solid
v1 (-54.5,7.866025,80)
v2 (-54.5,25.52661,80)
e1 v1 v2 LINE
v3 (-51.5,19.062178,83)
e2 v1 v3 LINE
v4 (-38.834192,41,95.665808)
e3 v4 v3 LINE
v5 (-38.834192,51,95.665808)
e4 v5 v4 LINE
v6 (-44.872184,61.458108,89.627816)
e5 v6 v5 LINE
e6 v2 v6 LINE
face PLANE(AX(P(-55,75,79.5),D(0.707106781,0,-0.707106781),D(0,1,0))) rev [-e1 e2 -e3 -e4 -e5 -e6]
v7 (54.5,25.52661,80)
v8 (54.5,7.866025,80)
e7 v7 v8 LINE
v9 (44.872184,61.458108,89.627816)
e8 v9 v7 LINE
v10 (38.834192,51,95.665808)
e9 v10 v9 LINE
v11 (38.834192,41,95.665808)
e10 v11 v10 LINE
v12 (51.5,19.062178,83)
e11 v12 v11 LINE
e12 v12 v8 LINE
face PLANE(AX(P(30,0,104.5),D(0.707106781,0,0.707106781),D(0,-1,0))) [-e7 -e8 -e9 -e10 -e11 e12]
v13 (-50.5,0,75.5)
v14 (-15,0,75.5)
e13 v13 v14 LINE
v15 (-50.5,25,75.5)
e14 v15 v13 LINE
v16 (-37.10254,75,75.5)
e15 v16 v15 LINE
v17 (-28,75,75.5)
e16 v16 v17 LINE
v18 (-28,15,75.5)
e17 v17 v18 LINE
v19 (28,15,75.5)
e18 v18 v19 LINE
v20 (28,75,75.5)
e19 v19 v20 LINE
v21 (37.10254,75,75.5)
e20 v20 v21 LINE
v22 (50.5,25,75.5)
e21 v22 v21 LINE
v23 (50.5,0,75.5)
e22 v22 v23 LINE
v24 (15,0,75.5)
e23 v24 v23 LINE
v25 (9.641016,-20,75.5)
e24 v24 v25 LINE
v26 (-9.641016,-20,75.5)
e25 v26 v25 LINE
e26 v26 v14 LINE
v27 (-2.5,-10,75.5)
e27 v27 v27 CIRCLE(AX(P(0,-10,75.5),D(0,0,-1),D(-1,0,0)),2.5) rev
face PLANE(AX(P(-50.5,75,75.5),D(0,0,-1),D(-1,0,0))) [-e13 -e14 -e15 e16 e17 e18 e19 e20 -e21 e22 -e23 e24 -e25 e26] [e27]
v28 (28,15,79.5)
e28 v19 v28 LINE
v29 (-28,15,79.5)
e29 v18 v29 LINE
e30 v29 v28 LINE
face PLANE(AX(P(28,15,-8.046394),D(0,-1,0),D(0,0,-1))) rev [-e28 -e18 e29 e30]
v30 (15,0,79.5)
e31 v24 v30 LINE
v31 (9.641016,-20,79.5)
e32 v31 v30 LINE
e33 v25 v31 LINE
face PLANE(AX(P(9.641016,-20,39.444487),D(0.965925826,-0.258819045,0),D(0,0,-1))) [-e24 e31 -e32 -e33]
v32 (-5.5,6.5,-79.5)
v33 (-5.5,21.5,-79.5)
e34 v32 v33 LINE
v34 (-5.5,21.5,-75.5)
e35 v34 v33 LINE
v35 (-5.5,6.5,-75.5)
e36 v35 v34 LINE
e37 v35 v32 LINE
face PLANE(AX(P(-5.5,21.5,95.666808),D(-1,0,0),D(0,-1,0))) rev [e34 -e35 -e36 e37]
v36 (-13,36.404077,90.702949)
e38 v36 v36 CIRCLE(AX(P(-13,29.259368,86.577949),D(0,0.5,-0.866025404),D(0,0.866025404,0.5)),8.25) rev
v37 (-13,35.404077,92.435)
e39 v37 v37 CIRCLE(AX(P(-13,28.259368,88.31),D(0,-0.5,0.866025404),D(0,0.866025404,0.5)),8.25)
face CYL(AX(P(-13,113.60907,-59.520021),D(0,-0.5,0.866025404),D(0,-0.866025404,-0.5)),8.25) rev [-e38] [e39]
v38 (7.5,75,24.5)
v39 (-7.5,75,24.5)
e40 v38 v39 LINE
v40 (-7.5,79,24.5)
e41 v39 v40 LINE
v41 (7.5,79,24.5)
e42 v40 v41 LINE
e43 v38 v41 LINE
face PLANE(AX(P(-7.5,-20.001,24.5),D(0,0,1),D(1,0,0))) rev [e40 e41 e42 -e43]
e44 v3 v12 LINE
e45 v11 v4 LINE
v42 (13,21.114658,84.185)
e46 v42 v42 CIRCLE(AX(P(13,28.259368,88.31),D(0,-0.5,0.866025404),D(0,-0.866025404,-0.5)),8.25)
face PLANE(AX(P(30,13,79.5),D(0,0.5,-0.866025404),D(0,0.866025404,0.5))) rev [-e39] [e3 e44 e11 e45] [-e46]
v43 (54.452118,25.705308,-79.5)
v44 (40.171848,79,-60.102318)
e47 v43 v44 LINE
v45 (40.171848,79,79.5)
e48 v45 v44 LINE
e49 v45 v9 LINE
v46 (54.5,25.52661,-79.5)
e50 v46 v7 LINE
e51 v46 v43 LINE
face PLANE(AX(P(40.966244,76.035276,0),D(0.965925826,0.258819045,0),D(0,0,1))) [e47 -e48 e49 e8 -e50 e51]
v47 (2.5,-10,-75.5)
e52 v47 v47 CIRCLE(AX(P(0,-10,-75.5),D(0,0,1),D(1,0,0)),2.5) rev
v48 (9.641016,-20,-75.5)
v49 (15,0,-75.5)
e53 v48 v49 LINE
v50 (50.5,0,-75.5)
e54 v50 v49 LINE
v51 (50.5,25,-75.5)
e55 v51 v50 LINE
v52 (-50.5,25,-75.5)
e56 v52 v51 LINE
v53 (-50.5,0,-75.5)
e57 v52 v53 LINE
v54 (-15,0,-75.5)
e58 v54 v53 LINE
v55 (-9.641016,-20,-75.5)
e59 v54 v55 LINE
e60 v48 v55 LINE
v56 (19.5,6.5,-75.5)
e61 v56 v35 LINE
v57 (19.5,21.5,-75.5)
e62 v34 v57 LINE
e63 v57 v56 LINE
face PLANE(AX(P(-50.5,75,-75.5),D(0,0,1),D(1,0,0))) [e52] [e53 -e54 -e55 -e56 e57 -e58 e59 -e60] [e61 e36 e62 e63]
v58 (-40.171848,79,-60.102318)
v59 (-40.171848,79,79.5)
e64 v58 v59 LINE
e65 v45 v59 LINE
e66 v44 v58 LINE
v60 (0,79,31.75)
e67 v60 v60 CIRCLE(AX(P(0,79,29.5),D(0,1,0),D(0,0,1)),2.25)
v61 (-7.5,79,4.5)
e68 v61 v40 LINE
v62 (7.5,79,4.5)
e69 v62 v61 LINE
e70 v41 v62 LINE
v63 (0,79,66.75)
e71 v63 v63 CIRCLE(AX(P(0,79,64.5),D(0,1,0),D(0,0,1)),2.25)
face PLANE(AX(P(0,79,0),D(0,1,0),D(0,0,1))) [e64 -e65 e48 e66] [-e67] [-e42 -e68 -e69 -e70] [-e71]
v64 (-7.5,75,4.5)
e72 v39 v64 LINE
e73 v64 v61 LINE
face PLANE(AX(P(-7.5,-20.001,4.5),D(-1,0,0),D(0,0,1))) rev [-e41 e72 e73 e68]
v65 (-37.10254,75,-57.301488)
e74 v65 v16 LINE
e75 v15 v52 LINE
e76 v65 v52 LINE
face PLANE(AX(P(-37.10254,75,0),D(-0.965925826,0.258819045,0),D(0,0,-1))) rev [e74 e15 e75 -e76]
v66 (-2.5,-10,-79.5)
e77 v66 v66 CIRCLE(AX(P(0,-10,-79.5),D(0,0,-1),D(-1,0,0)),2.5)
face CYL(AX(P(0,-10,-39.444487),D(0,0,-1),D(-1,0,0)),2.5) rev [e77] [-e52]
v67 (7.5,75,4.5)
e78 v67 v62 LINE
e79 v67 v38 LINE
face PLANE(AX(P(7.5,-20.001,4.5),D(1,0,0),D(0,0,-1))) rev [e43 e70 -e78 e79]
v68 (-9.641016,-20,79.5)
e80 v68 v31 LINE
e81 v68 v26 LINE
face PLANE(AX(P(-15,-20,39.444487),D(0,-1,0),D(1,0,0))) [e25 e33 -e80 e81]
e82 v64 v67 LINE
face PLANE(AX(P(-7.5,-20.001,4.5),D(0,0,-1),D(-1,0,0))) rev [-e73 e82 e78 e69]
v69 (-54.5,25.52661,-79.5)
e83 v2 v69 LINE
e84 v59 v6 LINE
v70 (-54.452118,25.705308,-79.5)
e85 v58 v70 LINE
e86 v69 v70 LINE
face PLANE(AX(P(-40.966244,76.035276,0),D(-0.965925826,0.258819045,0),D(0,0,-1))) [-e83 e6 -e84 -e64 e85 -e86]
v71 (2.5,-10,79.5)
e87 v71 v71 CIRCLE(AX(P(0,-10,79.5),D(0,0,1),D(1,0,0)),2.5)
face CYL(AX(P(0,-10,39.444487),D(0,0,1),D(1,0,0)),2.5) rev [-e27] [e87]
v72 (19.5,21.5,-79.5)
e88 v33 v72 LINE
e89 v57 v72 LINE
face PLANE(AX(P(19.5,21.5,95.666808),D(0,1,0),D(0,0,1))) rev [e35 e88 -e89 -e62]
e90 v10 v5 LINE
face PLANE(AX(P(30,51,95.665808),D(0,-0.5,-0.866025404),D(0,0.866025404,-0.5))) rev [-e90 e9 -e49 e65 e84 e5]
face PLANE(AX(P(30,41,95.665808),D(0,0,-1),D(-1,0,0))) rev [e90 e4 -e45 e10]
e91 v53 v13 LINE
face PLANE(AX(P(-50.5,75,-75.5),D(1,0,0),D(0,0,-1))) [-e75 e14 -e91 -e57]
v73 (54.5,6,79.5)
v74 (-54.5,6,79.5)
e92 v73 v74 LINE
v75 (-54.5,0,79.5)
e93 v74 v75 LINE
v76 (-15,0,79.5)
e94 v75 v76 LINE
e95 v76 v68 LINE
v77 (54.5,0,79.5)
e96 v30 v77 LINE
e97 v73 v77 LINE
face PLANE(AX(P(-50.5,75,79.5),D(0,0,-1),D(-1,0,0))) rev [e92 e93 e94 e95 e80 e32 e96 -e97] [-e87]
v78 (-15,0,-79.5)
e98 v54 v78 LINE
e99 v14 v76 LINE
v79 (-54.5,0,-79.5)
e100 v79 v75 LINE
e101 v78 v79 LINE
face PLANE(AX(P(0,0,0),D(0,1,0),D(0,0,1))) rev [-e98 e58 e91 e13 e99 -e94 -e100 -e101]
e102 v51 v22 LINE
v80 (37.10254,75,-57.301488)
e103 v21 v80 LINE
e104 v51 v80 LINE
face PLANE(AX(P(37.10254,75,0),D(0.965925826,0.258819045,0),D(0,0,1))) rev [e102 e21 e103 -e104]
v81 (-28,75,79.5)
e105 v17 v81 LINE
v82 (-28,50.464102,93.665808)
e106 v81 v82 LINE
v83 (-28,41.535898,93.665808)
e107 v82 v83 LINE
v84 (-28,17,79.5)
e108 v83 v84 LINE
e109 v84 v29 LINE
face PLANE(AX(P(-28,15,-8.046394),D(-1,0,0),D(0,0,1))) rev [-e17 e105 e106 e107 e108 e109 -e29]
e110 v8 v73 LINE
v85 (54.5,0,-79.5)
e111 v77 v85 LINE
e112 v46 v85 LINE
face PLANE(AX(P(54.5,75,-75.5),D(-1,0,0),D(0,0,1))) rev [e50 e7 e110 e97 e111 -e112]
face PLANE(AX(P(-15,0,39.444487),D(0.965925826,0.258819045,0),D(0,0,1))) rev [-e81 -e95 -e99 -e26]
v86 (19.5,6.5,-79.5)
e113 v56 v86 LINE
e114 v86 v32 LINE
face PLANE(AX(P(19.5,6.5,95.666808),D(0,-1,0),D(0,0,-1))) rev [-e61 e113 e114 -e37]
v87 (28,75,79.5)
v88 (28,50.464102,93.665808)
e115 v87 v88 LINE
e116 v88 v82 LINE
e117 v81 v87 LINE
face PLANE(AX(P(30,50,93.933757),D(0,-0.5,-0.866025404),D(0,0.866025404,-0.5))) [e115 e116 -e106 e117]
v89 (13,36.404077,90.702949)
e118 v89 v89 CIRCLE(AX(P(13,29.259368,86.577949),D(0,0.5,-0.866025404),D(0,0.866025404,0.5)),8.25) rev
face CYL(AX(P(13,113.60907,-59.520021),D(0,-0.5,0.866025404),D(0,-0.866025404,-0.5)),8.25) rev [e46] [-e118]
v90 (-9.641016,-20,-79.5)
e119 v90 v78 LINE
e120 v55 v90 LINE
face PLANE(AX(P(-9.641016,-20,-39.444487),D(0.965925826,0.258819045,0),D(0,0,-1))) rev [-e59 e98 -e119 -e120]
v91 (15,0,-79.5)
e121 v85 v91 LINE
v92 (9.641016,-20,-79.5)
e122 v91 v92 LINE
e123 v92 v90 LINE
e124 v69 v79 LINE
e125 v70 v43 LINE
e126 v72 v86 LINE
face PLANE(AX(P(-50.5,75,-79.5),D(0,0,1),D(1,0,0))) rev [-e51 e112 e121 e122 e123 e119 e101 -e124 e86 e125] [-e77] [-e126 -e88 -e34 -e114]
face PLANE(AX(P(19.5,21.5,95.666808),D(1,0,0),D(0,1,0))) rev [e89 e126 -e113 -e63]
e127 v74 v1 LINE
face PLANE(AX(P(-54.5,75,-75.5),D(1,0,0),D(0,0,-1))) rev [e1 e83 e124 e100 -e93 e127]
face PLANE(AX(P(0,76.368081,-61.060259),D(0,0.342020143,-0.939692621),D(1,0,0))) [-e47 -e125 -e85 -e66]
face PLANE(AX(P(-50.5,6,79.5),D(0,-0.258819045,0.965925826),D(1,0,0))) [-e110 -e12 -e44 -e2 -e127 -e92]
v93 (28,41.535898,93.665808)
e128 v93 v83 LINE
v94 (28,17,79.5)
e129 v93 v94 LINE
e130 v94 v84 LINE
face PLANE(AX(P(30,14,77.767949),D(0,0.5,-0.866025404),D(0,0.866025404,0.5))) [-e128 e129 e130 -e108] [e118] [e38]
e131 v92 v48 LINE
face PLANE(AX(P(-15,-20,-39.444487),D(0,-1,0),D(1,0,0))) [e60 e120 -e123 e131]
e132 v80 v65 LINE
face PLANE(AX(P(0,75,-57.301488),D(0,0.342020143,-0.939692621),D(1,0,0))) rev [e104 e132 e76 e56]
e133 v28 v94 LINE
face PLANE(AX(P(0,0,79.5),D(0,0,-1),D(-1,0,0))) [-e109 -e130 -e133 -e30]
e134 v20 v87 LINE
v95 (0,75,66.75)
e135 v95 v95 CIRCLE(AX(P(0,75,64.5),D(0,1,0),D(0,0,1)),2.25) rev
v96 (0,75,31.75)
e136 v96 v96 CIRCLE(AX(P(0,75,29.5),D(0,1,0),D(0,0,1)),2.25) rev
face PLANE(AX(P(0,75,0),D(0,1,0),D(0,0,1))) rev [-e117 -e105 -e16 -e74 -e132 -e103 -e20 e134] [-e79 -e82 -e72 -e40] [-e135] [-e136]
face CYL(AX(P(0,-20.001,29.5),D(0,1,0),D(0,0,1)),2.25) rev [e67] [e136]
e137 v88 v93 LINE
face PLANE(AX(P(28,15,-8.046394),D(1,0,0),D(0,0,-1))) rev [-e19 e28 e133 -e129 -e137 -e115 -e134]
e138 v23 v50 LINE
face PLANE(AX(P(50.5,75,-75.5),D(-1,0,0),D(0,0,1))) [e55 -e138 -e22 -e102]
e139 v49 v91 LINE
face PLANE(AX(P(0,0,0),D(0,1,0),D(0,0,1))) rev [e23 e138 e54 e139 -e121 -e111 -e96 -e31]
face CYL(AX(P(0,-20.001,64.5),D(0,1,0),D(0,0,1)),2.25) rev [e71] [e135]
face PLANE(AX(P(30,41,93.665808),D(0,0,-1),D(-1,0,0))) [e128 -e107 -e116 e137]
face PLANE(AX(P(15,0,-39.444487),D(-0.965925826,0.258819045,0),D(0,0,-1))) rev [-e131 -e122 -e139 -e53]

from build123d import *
from OCP.BRepFilletAPI import BRepFilletAPI_MakeChamfer

# Parameters (mm, degrees)
SKETCH1_W                                    = 101
SKETCH1_H                                    = 151
BOX_DEPTH                                    = 75
CHAMFER_SIDES_SIZE                           = 50
CHAMFER_SIDES_SIZE2                          = 13.397459622
CHAMFER_BACK_SIZE                            = 50
CHAMFER_BACK_SIZE2                           = 18.198511713
SHELL1_T                                     = 4
SKETCH2_W                                    = 30
SKETCH2_H                                    = 20
SKETCH2_R                                    = 2.5
FRONT_MOUNT_TAB_DEPTH                        = 4
BACK_START                                   = -4
SKETCH3_W                                    = 30
SKETCH3_H                                    = 20
SKETCH3_R                                    = 2.5
BACK_MOUNT_TAB_DEPTH                         = 4
CHAMFER_MOUNT_TAB_SIZE                       = 20
CHAMFER_MOUNT_TAB_SIZE_2                     = 5.358983849
HEAD_ASSEMBLY_MOUNT_AND_CABLE_PASSTHRU_REACH = 140.172
SKETCH4_R                                    = 2.25
SKETCH4_W                                    = 15
SKETCH4_H                                    = 20
STAIR_DETECTION_MOUNT_DEPTH                  = 30
SHELL_START                                  = -28
SHELL_MOUNT_DEPTH                            = 56
SKETCH7_W                                    = 56
SKETCH7_H                                    = 62
OPEN_SHELL_TO_SHELL_DEPTH                    = 4
FILL_GAP_REACH                               = 187.721
SKETCH9_W                                    = 56
SKETCH9_H                                    = 2
STAIR_DETECTION_EYE_HOLES_REACH              = 183.466
SKETCH8_R                                    = 8.25
CHAMFER_FRONT_1_SIZE                         = 25
CHAMFER_FRONT_2_SIZE                         = 7
POWER_SWITCH_AND_USB_ACCESS_REACH            = 201.736
SKETCH10_W                                   = 25
SKETCH10_H                                   = 15


# Read off the part's stored shape, not the designer's step: shell mount
# Some blends are built 0.0001 mm under size
with BuildPart() as part:
    # Sketch1 → box (new body)
    with BuildSketch(Plane(origin=(0, 0, 0), x_dir=(1, 0, 0), z_dir=(0, 1, 0))):
        Rectangle(SKETCH1_W, SKETCH1_H)
    extrude(amount=BOX_DEPTH)

    # Chamfer sides: one chamfer whose edges measure the first distance from different faces: ONE call of the kernel's chamfer builder (chamfer() names one face for all edges)
    chamfer_sides_edges_1 = [part.edges().sort_by_distance(p)[0] for p in [
        (-50.5, 75, 0),
    ]]
    chamfer_sides_side_1 = [part.faces().sort_by_distance(p)[0] for p in [
        (-50.5, 37.5, 0),
    ]]
    chamfer_sides_edges_2 = [part.edges().sort_by_distance(p)[0] for p in [
        (50.5, 75, 0),
    ]]
    chamfer_sides_side_2 = [part.faces().sort_by_distance(p)[0] for p in [
        (50.5, 37.5, 0),
    ]]
    chamfer_sides = BRepFilletAPI_MakeChamfer(part.part.solid().wrapped)
    for e in chamfer_sides_edges_1:
        chamfer_sides.Add(CHAMFER_SIDES_SIZE, CHAMFER_SIDES_SIZE2, e.wrapped, chamfer_sides_side_1[0].wrapped)  # the first distance lies on this face
    for e in chamfer_sides_edges_2:
        chamfer_sides.Add(CHAMFER_SIDES_SIZE, CHAMFER_SIDES_SIZE2, e.wrapped, chamfer_sides_side_2[0].wrapped)  # the first distance lies on this face
    add(Compound.cast(chamfer_sides.Shape()), mode=Mode.REPLACE)

    # Chamfer back
    chamfer_back_edges = [part.edges().sort_by_distance(p)[0] for p in [
        (0, 75, -75.5),
    ]]
    chamfer_back_side = [part.faces().sort_by_distance(p)[0] for p in [
        (0, 35.478938394, -75.5),
    ]]
    chamfer(chamfer_back_edges, length=CHAMFER_BACK_SIZE, length2=CHAMFER_BACK_SIZE2, reference=chamfer_back_side[0])

    # Shell1
    shell1_openings = [part.faces().sort_by_distance(p)[0] for p in [
        (0, 0, 0),
    ]]
    offset(amount=SHELL1_T, openings=shell1_openings, kind=Kind.INTERSECTION)

    # Sketch2 → front mount tab (add)
    with BuildSketch(Plane.XY.offset(79.5)):
        with Locations((0, -10)):
            Rectangle(SKETCH2_W, SKETCH2_H)
        with Locations((0, -10)):
            Circle(SKETCH2_R, mode=Mode.SUBTRACT)
    extrude(amount=-FRONT_MOUNT_TAB_DEPTH)

    # Sketch3 → back mount tab (add)
    with BuildSketch(Plane(origin=(0, 0, -79.5), x_dir=(-1, 0, 0), z_dir=(0, 0, -1)).offset(BACK_START)):
        with Locations((0, -10)):
            Rectangle(SKETCH3_W, SKETCH3_H)
        with Locations(Location((0, -10, 0), (0, 0, 180))):
            Circle(SKETCH3_R, mode=Mode.SUBTRACT)
    extrude(amount=BACK_MOUNT_TAB_DEPTH)

    # Chamfer mount tab
    chamfer_mount_tab_edges_1 = [part.edges().sort_by_distance(p)[0] for p in [
        (-15, -20, 77.5),
    ]]
    chamfer_mount_tab_side_1 = [part.faces().sort_by_distance(p)[0] for p in [
        (-15, -19.892820323, 77.5),
    ]]
    chamfer_mount_tab_edges_2 = [part.edges().sort_by_distance(p)[0] for p in [
        (15, -20, 77.5),
    ]]
    chamfer_mount_tab_side_2 = [part.faces().sort_by_distance(p)[0] for p in [
        (15, -19.892820323, 77.5),
    ]]
    chamfer_mount_tab_edges_3 = [part.edges().sort_by_distance(p)[0] for p in [
        (-15, -20, -77.5),
    ]]
    chamfer_mount_tab_side_3 = [part.faces().sort_by_distance(p)[0] for p in [
        (-15, -19.892820323, -77.5),
    ]]
    chamfer_mount_tab_edges_4 = [part.edges().sort_by_distance(p)[0] for p in [
        (15, -20, -77.5),
    ]]
    chamfer_mount_tab_side_4 = [part.faces().sort_by_distance(p)[0] for p in [
        (14.892820323, -20, -77.5),
    ]]
    chamfer_mount_tab = BRepFilletAPI_MakeChamfer(part.part.solid().wrapped)
    for e in chamfer_mount_tab_edges_1:
        chamfer_mount_tab.Add(CHAMFER_MOUNT_TAB_SIZE - 0.0001, CHAMFER_MOUNT_TAB_SIZE_2 - 0.0001, e.wrapped, chamfer_mount_tab_side_1[0].wrapped)
    for e in chamfer_mount_tab_edges_2:
        chamfer_mount_tab.Add(CHAMFER_MOUNT_TAB_SIZE - 0.0001, CHAMFER_MOUNT_TAB_SIZE_2 - 0.0001, e.wrapped, chamfer_mount_tab_side_2[0].wrapped)
    for e in chamfer_mount_tab_edges_3:
        chamfer_mount_tab.Add(CHAMFER_MOUNT_TAB_SIZE - 0.0001, CHAMFER_MOUNT_TAB_SIZE_2 - 0.0001, e.wrapped, chamfer_mount_tab_side_3[0].wrapped)
    for e in chamfer_mount_tab_edges_4:
        chamfer_mount_tab.Add(CHAMFER_MOUNT_TAB_SIZE_2 - 0.0001, CHAMFER_MOUNT_TAB_SIZE - 0.0001, e.wrapped, chamfer_mount_tab_side_4[0].wrapped)
    add(Compound.cast(chamfer_mount_tab.Shape()), mode=Mode.REPLACE)  # a hair under: the kernel refuses the full size

    # Sketch4 → head assembly mount and cable passthru (cut, up to next)
    with BuildSketch(Plane(origin=(0, 79, 0), x_dir=(1, 0, 0), z_dir=(0, 1, 0)), mode=Mode.PRIVATE) as head_assembly_mount_and_cable_passthru_sk1:
        with Locations(Location((0, -64.5, 0), (0, 0, 270))):
            Circle(SKETCH4_R)
    head_assembly_mount_and_cable_passthru_tool1 = extrude(head_assembly_mount_and_cable_passthru_sk1.sketch, amount=-HEAD_ASSEMBLY_MOUNT_AND_CABLE_PASSTHRU_REACH, mode=Mode.PRIVATE) & part.part
    # Sketch4 → head assembly mount and cable passthru (cut, up to next)
    with BuildSketch(Plane(origin=(0, 79, 0), x_dir=(1, 0, 0), z_dir=(0, 1, 0)), mode=Mode.PRIVATE) as head_assembly_mount_and_cable_passthru_sk2:
        with Locations(Location((0, -29.5, 0), (0, 0, 270))):
            Circle(SKETCH4_R)
    head_assembly_mount_and_cable_passthru_tool2 = extrude(head_assembly_mount_and_cable_passthru_sk2.sketch, amount=-HEAD_ASSEMBLY_MOUNT_AND_CABLE_PASSTHRU_REACH, mode=Mode.PRIVATE) & part.part
    # Sketch4 → head assembly mount and cable passthru (cut, up to next)
    with BuildSketch(Plane(origin=(0, 79, 0), x_dir=(1, 0, 0), z_dir=(0, 1, 0)), mode=Mode.PRIVATE) as head_assembly_mount_and_cable_passthru_sk3:
        with Locations((0, -14.5)):
            Rectangle(SKETCH4_W, SKETCH4_H)
    head_assembly_mount_and_cable_passthru_tool3 = extrude(head_assembly_mount_and_cable_passthru_sk3.sketch, amount=-HEAD_ASSEMBLY_MOUNT_AND_CABLE_PASSTHRU_REACH, mode=Mode.PRIVATE) & part.part
    add(head_assembly_mount_and_cable_passthru_tool1.solids().sort_by_distance((0, 79, 64.5))[0], mode=Mode.SUBTRACT)
    add(head_assembly_mount_and_cable_passthru_tool2.solids().sort_by_distance((0, 79, 29.5))[0], mode=Mode.SUBTRACT)
    add(head_assembly_mount_and_cable_passthru_tool3.solids().sort_by_distance((0, 79, 14.5))[0], mode=Mode.SUBTRACT)


with BuildPart() as body_2:
    # Sketch5 → stair detection mount (new, symmetric)
    with BuildSketch(Plane(origin=(0, 0, 0), x_dir=(0, 0, -1), z_dir=(1, 0, 0))):
        Polygon((-79.5, 13), (-95.665807537, 41), (-95.665807537, 51), (-79.5, 79), (-75.5, 79), (-75.5, 75), (-75.5, 25), (-75.5, 13), align=None)
    extrude(amount=STAIR_DETECTION_MOUNT_DEPTH, both=True)

    # shell mount outline → shell mount (cut)
    with BuildSketch(Plane.YZ.offset(SHELL_START)):
        Polygon((77, 75.5), (77, 78.345299462), (50.464101615, 93.665807537), (41.535898385, 93.665807537), (15, 78.345299462), (15, 75.5), align=None)
    extrude(amount=SHELL_MOUNT_DEPTH, mode=Mode.SUBTRACT)


with BuildPart() as open_shell_to_shell_tool:
    # Sketch7 → open shell to shell (new body)
    with BuildSketch(Plane.XY.offset(79.5)):
        with Locations((0, 46)):
            Rectangle(SKETCH7_W, SKETCH7_H)
    extrude(amount=-OPEN_SHELL_TO_SHELL_DEPTH)


with BuildPart() as part_1:
    add(part.part)

    # open shell to shell: cut by open_shell_to_shell_tool
    add(open_shell_to_shell_tool.part, mode=Mode.SUBTRACT)

    # Sketch9 → fill gap (add, up to next)
    with BuildSketch(Plane(origin=(0, 0, 79.5), x_dir=(-1, 0, 0), z_dir=(0, 0, -1)), mode=Mode.PRIVATE) as fill_gap_sk1:
        with Locations((0, 76)):
            Rectangle(SKETCH9_W, SKETCH9_H)
    fill_gap_tool1 = extrude(fill_gap_sk1.sketch, amount=FILL_GAP_REACH, mode=Mode.PRIVATE) - part_1.part
    add(fill_gap_tool1.solids().sort_by_distance((0, 76, 79.5))[0])


with BuildPart() as body_2_1:
    add(body_2.part)

    # open shell to shell: cut by open_shell_to_shell_tool
    add(open_shell_to_shell_tool.part, mode=Mode.SUBTRACT)


with BuildPart() as part_2:
    add(part_1.part)

    # Combine two shells: union body 2
    add(body_2_1.part)

    # Sketch8 → stair detection eye holes (cut, up to next)
    with BuildSketch(Plane(origin=(0, -31.1745098, 53.995834875), x_dir=(1, 0, 0), z_dir=(0, -0.4999999999999956, 0.8660254037844412)), mode=Mode.PRIVATE) as stair_detection_eye_holes_sk1:
        with Locations(Location((13, 68.628330249, 0), (0, 0, 270))):
            Circle(SKETCH8_R)
    stair_detection_eye_holes_tool1 = extrude(stair_detection_eye_holes_sk1.sketch, amount=-STAIR_DETECTION_EYE_HOLES_REACH, mode=Mode.PRIVATE) & part_2.part
    # Sketch8 → stair detection eye holes (cut, up to next)
    with BuildSketch(Plane(origin=(0, -31.1745098, 53.995834875), x_dir=(1, 0, 0), z_dir=(0, -0.4999999999999956, 0.8660254037844412)), mode=Mode.PRIVATE) as stair_detection_eye_holes_sk2:
        with Locations(Location((-13, 68.628330249, 0), (0, 0, 90))):
            Circle(SKETCH8_R)
    stair_detection_eye_holes_tool2 = extrude(stair_detection_eye_holes_sk2.sketch, amount=-STAIR_DETECTION_EYE_HOLES_REACH, mode=Mode.PRIVATE) & part_2.part
    add(stair_detection_eye_holes_tool1.solids().sort_by_distance((13, 28.259368, 88.31))[0], mode=Mode.SUBTRACT)
    add(stair_detection_eye_holes_tool2.solids().sort_by_distance((-13, 28.259368, 88.31))[0], mode=Mode.SUBTRACT)

    # Chamfer front 1
    # the kernel refuses this chamfer: 25 mm, written as the material it adds along each edge
    with BuildSketch(Plane(origin=(-30, 79, 79.5), x_dir=(-0.9996219169112966, 0, -0.027495876610586594), z_dir=(0, -1, 0))) as chamfer_front_1_piece_1_section:
        Polygon((CHAMFER_FRONT_1_SIZE * 0.999621916911, -CHAMFER_FRONT_1_SIZE * 0.0274958766106), (-CHAMFER_FRONT_1_SIZE * 0.0274958766106, -CHAMFER_FRONT_1_SIZE * 0.999621916911), (0, 0), align=None)
    chamfer_front_1_piece_1 = extrude(amount=130.292074699, mode=Mode.PRIVATE)
    chamfer_front_1_piece_1 = split(chamfer_front_1_piece_1, bisect_by=Plane(origin=(-54.5, 43.759151697, 84.684492494), z_dir=(1, 0, 0)), keep=Keep.TOP, mode=Mode.PRIVATE)
    chamfer_front_1_piece_1 = split(chamfer_front_1_piece_1, bisect_by=Plane(origin=(-48.880491022, 46.498903009, 84.684492494), z_dir=(0.9659258262890682, -0.25881904510252135, 0)), keep=Keep.TOP, mode=Mode.PRIVATE)
    chamfer_front_1_piece_1 = split(chamfer_front_1_piece_1, bisect_by=Plane(origin=(-38.655599925, 38.314314876, 94.115226508), z_dir=(0, 0.4999999999999953, -0.8660254037844416)), keep=Keep.TOP, mode=Mode.PRIVATE)
    chamfer_front_1_piece_1 = split(chamfer_front_1_piece_1, bisect_by=Plane(origin=(-38.655599925, 50.32441267, 96.055858064), z_dir=(0, -0.4999999999999949, -0.8660254037844416)), keep=Keep.TOP, mode=Mode.PRIVATE)
    chamfer_front_1_piece_1 = split(chamfer_front_1_piece_1, bisect_by=Plane(origin=(-38.655599925, 43.759151697, 95.665807537), z_dir=(0, 0, -1)), keep=Keep.TOP, mode=Mode.PRIVATE)
    add(chamfer_front_1_piece_1)
    with BuildSketch(Plane(origin=(30, 79, 79.5), x_dir=(0.9996219169112966, 0, -0.027495876610586594), z_dir=(0, -1, 0))) as chamfer_front_1_piece_2_section:
        Polygon((CHAMFER_FRONT_1_SIZE * 0.999621916911, CHAMFER_FRONT_1_SIZE * 0.0274958766106), (-CHAMFER_FRONT_1_SIZE * 0.0274958766106, CHAMFER_FRONT_1_SIZE * 0.999621916911), (0, 0), align=None)
    chamfer_front_1_piece_2 = extrude(amount=130.292074699, mode=Mode.PRIVATE)
    chamfer_front_1_piece_2 = split(chamfer_front_1_piece_2, bisect_by=Plane(origin=(38.655599925, 38.314314876, 94.115226508), z_dir=(0, 0.4999999999999953, -0.8660254037844416)), keep=Keep.TOP, mode=Mode.PRIVATE)
    chamfer_front_1_piece_2 = split(chamfer_front_1_piece_2, bisect_by=Plane(origin=(48.880491022, 46.498903009, 84.684492494), z_dir=(-0.9659258262890682, -0.25881904510252135, 0)), keep=Keep.TOP, mode=Mode.PRIVATE)
    chamfer_front_1_piece_2 = split(chamfer_front_1_piece_2, bisect_by=Plane(origin=(54.5, 43.759151697, 84.684492494), z_dir=(-1, 0, 0)), keep=Keep.TOP, mode=Mode.PRIVATE)
    chamfer_front_1_piece_2 = split(chamfer_front_1_piece_2, bisect_by=Plane(origin=(38.655599925, 50.32441267, 96.055858064), z_dir=(0, -0.4999999999999949, -0.8660254037844416)), keep=Keep.TOP, mode=Mode.PRIVATE)
    chamfer_front_1_piece_2 = split(chamfer_front_1_piece_2, bisect_by=Plane(origin=(38.655599925, 43.759151697, 95.665807537), z_dir=(0, 0, -1)), keep=Keep.TOP, mode=Mode.PRIVATE)
    add(chamfer_front_1_piece_2)

    # Chamfer front 2
    chamfer_front_2_edges = [part_2.edges().sort_by_distance(p)[0] for p in [
        (0, 13, 79.5),
    ]]
    chamfer(chamfer_front_2_edges, length=CHAMFER_FRONT_2_SIZE)

    # Sketch10 → power switch and USB access (cut, up to next)
    with BuildSketch(Plane(origin=(0, 0, -79.5), x_dir=(-1, 0, 0), z_dir=(0, 0, -1)), mode=Mode.PRIVATE) as power_switch_and_usb_access_sk1:
        with Locations((-7, 14)):
            Rectangle(SKETCH10_W, SKETCH10_H)
    power_switch_and_usb_access_tool1 = extrude(power_switch_and_usb_access_sk1.sketch, amount=-POWER_SWITCH_AND_USB_ACCESS_REACH, mode=Mode.PRIVATE) & part_2.part
    add(power_switch_and_usb_access_tool1.solids().sort_by_distance((7, 14, -79.5))[0], mode=Mode.SUBTRACT)


solid = part_2.part
